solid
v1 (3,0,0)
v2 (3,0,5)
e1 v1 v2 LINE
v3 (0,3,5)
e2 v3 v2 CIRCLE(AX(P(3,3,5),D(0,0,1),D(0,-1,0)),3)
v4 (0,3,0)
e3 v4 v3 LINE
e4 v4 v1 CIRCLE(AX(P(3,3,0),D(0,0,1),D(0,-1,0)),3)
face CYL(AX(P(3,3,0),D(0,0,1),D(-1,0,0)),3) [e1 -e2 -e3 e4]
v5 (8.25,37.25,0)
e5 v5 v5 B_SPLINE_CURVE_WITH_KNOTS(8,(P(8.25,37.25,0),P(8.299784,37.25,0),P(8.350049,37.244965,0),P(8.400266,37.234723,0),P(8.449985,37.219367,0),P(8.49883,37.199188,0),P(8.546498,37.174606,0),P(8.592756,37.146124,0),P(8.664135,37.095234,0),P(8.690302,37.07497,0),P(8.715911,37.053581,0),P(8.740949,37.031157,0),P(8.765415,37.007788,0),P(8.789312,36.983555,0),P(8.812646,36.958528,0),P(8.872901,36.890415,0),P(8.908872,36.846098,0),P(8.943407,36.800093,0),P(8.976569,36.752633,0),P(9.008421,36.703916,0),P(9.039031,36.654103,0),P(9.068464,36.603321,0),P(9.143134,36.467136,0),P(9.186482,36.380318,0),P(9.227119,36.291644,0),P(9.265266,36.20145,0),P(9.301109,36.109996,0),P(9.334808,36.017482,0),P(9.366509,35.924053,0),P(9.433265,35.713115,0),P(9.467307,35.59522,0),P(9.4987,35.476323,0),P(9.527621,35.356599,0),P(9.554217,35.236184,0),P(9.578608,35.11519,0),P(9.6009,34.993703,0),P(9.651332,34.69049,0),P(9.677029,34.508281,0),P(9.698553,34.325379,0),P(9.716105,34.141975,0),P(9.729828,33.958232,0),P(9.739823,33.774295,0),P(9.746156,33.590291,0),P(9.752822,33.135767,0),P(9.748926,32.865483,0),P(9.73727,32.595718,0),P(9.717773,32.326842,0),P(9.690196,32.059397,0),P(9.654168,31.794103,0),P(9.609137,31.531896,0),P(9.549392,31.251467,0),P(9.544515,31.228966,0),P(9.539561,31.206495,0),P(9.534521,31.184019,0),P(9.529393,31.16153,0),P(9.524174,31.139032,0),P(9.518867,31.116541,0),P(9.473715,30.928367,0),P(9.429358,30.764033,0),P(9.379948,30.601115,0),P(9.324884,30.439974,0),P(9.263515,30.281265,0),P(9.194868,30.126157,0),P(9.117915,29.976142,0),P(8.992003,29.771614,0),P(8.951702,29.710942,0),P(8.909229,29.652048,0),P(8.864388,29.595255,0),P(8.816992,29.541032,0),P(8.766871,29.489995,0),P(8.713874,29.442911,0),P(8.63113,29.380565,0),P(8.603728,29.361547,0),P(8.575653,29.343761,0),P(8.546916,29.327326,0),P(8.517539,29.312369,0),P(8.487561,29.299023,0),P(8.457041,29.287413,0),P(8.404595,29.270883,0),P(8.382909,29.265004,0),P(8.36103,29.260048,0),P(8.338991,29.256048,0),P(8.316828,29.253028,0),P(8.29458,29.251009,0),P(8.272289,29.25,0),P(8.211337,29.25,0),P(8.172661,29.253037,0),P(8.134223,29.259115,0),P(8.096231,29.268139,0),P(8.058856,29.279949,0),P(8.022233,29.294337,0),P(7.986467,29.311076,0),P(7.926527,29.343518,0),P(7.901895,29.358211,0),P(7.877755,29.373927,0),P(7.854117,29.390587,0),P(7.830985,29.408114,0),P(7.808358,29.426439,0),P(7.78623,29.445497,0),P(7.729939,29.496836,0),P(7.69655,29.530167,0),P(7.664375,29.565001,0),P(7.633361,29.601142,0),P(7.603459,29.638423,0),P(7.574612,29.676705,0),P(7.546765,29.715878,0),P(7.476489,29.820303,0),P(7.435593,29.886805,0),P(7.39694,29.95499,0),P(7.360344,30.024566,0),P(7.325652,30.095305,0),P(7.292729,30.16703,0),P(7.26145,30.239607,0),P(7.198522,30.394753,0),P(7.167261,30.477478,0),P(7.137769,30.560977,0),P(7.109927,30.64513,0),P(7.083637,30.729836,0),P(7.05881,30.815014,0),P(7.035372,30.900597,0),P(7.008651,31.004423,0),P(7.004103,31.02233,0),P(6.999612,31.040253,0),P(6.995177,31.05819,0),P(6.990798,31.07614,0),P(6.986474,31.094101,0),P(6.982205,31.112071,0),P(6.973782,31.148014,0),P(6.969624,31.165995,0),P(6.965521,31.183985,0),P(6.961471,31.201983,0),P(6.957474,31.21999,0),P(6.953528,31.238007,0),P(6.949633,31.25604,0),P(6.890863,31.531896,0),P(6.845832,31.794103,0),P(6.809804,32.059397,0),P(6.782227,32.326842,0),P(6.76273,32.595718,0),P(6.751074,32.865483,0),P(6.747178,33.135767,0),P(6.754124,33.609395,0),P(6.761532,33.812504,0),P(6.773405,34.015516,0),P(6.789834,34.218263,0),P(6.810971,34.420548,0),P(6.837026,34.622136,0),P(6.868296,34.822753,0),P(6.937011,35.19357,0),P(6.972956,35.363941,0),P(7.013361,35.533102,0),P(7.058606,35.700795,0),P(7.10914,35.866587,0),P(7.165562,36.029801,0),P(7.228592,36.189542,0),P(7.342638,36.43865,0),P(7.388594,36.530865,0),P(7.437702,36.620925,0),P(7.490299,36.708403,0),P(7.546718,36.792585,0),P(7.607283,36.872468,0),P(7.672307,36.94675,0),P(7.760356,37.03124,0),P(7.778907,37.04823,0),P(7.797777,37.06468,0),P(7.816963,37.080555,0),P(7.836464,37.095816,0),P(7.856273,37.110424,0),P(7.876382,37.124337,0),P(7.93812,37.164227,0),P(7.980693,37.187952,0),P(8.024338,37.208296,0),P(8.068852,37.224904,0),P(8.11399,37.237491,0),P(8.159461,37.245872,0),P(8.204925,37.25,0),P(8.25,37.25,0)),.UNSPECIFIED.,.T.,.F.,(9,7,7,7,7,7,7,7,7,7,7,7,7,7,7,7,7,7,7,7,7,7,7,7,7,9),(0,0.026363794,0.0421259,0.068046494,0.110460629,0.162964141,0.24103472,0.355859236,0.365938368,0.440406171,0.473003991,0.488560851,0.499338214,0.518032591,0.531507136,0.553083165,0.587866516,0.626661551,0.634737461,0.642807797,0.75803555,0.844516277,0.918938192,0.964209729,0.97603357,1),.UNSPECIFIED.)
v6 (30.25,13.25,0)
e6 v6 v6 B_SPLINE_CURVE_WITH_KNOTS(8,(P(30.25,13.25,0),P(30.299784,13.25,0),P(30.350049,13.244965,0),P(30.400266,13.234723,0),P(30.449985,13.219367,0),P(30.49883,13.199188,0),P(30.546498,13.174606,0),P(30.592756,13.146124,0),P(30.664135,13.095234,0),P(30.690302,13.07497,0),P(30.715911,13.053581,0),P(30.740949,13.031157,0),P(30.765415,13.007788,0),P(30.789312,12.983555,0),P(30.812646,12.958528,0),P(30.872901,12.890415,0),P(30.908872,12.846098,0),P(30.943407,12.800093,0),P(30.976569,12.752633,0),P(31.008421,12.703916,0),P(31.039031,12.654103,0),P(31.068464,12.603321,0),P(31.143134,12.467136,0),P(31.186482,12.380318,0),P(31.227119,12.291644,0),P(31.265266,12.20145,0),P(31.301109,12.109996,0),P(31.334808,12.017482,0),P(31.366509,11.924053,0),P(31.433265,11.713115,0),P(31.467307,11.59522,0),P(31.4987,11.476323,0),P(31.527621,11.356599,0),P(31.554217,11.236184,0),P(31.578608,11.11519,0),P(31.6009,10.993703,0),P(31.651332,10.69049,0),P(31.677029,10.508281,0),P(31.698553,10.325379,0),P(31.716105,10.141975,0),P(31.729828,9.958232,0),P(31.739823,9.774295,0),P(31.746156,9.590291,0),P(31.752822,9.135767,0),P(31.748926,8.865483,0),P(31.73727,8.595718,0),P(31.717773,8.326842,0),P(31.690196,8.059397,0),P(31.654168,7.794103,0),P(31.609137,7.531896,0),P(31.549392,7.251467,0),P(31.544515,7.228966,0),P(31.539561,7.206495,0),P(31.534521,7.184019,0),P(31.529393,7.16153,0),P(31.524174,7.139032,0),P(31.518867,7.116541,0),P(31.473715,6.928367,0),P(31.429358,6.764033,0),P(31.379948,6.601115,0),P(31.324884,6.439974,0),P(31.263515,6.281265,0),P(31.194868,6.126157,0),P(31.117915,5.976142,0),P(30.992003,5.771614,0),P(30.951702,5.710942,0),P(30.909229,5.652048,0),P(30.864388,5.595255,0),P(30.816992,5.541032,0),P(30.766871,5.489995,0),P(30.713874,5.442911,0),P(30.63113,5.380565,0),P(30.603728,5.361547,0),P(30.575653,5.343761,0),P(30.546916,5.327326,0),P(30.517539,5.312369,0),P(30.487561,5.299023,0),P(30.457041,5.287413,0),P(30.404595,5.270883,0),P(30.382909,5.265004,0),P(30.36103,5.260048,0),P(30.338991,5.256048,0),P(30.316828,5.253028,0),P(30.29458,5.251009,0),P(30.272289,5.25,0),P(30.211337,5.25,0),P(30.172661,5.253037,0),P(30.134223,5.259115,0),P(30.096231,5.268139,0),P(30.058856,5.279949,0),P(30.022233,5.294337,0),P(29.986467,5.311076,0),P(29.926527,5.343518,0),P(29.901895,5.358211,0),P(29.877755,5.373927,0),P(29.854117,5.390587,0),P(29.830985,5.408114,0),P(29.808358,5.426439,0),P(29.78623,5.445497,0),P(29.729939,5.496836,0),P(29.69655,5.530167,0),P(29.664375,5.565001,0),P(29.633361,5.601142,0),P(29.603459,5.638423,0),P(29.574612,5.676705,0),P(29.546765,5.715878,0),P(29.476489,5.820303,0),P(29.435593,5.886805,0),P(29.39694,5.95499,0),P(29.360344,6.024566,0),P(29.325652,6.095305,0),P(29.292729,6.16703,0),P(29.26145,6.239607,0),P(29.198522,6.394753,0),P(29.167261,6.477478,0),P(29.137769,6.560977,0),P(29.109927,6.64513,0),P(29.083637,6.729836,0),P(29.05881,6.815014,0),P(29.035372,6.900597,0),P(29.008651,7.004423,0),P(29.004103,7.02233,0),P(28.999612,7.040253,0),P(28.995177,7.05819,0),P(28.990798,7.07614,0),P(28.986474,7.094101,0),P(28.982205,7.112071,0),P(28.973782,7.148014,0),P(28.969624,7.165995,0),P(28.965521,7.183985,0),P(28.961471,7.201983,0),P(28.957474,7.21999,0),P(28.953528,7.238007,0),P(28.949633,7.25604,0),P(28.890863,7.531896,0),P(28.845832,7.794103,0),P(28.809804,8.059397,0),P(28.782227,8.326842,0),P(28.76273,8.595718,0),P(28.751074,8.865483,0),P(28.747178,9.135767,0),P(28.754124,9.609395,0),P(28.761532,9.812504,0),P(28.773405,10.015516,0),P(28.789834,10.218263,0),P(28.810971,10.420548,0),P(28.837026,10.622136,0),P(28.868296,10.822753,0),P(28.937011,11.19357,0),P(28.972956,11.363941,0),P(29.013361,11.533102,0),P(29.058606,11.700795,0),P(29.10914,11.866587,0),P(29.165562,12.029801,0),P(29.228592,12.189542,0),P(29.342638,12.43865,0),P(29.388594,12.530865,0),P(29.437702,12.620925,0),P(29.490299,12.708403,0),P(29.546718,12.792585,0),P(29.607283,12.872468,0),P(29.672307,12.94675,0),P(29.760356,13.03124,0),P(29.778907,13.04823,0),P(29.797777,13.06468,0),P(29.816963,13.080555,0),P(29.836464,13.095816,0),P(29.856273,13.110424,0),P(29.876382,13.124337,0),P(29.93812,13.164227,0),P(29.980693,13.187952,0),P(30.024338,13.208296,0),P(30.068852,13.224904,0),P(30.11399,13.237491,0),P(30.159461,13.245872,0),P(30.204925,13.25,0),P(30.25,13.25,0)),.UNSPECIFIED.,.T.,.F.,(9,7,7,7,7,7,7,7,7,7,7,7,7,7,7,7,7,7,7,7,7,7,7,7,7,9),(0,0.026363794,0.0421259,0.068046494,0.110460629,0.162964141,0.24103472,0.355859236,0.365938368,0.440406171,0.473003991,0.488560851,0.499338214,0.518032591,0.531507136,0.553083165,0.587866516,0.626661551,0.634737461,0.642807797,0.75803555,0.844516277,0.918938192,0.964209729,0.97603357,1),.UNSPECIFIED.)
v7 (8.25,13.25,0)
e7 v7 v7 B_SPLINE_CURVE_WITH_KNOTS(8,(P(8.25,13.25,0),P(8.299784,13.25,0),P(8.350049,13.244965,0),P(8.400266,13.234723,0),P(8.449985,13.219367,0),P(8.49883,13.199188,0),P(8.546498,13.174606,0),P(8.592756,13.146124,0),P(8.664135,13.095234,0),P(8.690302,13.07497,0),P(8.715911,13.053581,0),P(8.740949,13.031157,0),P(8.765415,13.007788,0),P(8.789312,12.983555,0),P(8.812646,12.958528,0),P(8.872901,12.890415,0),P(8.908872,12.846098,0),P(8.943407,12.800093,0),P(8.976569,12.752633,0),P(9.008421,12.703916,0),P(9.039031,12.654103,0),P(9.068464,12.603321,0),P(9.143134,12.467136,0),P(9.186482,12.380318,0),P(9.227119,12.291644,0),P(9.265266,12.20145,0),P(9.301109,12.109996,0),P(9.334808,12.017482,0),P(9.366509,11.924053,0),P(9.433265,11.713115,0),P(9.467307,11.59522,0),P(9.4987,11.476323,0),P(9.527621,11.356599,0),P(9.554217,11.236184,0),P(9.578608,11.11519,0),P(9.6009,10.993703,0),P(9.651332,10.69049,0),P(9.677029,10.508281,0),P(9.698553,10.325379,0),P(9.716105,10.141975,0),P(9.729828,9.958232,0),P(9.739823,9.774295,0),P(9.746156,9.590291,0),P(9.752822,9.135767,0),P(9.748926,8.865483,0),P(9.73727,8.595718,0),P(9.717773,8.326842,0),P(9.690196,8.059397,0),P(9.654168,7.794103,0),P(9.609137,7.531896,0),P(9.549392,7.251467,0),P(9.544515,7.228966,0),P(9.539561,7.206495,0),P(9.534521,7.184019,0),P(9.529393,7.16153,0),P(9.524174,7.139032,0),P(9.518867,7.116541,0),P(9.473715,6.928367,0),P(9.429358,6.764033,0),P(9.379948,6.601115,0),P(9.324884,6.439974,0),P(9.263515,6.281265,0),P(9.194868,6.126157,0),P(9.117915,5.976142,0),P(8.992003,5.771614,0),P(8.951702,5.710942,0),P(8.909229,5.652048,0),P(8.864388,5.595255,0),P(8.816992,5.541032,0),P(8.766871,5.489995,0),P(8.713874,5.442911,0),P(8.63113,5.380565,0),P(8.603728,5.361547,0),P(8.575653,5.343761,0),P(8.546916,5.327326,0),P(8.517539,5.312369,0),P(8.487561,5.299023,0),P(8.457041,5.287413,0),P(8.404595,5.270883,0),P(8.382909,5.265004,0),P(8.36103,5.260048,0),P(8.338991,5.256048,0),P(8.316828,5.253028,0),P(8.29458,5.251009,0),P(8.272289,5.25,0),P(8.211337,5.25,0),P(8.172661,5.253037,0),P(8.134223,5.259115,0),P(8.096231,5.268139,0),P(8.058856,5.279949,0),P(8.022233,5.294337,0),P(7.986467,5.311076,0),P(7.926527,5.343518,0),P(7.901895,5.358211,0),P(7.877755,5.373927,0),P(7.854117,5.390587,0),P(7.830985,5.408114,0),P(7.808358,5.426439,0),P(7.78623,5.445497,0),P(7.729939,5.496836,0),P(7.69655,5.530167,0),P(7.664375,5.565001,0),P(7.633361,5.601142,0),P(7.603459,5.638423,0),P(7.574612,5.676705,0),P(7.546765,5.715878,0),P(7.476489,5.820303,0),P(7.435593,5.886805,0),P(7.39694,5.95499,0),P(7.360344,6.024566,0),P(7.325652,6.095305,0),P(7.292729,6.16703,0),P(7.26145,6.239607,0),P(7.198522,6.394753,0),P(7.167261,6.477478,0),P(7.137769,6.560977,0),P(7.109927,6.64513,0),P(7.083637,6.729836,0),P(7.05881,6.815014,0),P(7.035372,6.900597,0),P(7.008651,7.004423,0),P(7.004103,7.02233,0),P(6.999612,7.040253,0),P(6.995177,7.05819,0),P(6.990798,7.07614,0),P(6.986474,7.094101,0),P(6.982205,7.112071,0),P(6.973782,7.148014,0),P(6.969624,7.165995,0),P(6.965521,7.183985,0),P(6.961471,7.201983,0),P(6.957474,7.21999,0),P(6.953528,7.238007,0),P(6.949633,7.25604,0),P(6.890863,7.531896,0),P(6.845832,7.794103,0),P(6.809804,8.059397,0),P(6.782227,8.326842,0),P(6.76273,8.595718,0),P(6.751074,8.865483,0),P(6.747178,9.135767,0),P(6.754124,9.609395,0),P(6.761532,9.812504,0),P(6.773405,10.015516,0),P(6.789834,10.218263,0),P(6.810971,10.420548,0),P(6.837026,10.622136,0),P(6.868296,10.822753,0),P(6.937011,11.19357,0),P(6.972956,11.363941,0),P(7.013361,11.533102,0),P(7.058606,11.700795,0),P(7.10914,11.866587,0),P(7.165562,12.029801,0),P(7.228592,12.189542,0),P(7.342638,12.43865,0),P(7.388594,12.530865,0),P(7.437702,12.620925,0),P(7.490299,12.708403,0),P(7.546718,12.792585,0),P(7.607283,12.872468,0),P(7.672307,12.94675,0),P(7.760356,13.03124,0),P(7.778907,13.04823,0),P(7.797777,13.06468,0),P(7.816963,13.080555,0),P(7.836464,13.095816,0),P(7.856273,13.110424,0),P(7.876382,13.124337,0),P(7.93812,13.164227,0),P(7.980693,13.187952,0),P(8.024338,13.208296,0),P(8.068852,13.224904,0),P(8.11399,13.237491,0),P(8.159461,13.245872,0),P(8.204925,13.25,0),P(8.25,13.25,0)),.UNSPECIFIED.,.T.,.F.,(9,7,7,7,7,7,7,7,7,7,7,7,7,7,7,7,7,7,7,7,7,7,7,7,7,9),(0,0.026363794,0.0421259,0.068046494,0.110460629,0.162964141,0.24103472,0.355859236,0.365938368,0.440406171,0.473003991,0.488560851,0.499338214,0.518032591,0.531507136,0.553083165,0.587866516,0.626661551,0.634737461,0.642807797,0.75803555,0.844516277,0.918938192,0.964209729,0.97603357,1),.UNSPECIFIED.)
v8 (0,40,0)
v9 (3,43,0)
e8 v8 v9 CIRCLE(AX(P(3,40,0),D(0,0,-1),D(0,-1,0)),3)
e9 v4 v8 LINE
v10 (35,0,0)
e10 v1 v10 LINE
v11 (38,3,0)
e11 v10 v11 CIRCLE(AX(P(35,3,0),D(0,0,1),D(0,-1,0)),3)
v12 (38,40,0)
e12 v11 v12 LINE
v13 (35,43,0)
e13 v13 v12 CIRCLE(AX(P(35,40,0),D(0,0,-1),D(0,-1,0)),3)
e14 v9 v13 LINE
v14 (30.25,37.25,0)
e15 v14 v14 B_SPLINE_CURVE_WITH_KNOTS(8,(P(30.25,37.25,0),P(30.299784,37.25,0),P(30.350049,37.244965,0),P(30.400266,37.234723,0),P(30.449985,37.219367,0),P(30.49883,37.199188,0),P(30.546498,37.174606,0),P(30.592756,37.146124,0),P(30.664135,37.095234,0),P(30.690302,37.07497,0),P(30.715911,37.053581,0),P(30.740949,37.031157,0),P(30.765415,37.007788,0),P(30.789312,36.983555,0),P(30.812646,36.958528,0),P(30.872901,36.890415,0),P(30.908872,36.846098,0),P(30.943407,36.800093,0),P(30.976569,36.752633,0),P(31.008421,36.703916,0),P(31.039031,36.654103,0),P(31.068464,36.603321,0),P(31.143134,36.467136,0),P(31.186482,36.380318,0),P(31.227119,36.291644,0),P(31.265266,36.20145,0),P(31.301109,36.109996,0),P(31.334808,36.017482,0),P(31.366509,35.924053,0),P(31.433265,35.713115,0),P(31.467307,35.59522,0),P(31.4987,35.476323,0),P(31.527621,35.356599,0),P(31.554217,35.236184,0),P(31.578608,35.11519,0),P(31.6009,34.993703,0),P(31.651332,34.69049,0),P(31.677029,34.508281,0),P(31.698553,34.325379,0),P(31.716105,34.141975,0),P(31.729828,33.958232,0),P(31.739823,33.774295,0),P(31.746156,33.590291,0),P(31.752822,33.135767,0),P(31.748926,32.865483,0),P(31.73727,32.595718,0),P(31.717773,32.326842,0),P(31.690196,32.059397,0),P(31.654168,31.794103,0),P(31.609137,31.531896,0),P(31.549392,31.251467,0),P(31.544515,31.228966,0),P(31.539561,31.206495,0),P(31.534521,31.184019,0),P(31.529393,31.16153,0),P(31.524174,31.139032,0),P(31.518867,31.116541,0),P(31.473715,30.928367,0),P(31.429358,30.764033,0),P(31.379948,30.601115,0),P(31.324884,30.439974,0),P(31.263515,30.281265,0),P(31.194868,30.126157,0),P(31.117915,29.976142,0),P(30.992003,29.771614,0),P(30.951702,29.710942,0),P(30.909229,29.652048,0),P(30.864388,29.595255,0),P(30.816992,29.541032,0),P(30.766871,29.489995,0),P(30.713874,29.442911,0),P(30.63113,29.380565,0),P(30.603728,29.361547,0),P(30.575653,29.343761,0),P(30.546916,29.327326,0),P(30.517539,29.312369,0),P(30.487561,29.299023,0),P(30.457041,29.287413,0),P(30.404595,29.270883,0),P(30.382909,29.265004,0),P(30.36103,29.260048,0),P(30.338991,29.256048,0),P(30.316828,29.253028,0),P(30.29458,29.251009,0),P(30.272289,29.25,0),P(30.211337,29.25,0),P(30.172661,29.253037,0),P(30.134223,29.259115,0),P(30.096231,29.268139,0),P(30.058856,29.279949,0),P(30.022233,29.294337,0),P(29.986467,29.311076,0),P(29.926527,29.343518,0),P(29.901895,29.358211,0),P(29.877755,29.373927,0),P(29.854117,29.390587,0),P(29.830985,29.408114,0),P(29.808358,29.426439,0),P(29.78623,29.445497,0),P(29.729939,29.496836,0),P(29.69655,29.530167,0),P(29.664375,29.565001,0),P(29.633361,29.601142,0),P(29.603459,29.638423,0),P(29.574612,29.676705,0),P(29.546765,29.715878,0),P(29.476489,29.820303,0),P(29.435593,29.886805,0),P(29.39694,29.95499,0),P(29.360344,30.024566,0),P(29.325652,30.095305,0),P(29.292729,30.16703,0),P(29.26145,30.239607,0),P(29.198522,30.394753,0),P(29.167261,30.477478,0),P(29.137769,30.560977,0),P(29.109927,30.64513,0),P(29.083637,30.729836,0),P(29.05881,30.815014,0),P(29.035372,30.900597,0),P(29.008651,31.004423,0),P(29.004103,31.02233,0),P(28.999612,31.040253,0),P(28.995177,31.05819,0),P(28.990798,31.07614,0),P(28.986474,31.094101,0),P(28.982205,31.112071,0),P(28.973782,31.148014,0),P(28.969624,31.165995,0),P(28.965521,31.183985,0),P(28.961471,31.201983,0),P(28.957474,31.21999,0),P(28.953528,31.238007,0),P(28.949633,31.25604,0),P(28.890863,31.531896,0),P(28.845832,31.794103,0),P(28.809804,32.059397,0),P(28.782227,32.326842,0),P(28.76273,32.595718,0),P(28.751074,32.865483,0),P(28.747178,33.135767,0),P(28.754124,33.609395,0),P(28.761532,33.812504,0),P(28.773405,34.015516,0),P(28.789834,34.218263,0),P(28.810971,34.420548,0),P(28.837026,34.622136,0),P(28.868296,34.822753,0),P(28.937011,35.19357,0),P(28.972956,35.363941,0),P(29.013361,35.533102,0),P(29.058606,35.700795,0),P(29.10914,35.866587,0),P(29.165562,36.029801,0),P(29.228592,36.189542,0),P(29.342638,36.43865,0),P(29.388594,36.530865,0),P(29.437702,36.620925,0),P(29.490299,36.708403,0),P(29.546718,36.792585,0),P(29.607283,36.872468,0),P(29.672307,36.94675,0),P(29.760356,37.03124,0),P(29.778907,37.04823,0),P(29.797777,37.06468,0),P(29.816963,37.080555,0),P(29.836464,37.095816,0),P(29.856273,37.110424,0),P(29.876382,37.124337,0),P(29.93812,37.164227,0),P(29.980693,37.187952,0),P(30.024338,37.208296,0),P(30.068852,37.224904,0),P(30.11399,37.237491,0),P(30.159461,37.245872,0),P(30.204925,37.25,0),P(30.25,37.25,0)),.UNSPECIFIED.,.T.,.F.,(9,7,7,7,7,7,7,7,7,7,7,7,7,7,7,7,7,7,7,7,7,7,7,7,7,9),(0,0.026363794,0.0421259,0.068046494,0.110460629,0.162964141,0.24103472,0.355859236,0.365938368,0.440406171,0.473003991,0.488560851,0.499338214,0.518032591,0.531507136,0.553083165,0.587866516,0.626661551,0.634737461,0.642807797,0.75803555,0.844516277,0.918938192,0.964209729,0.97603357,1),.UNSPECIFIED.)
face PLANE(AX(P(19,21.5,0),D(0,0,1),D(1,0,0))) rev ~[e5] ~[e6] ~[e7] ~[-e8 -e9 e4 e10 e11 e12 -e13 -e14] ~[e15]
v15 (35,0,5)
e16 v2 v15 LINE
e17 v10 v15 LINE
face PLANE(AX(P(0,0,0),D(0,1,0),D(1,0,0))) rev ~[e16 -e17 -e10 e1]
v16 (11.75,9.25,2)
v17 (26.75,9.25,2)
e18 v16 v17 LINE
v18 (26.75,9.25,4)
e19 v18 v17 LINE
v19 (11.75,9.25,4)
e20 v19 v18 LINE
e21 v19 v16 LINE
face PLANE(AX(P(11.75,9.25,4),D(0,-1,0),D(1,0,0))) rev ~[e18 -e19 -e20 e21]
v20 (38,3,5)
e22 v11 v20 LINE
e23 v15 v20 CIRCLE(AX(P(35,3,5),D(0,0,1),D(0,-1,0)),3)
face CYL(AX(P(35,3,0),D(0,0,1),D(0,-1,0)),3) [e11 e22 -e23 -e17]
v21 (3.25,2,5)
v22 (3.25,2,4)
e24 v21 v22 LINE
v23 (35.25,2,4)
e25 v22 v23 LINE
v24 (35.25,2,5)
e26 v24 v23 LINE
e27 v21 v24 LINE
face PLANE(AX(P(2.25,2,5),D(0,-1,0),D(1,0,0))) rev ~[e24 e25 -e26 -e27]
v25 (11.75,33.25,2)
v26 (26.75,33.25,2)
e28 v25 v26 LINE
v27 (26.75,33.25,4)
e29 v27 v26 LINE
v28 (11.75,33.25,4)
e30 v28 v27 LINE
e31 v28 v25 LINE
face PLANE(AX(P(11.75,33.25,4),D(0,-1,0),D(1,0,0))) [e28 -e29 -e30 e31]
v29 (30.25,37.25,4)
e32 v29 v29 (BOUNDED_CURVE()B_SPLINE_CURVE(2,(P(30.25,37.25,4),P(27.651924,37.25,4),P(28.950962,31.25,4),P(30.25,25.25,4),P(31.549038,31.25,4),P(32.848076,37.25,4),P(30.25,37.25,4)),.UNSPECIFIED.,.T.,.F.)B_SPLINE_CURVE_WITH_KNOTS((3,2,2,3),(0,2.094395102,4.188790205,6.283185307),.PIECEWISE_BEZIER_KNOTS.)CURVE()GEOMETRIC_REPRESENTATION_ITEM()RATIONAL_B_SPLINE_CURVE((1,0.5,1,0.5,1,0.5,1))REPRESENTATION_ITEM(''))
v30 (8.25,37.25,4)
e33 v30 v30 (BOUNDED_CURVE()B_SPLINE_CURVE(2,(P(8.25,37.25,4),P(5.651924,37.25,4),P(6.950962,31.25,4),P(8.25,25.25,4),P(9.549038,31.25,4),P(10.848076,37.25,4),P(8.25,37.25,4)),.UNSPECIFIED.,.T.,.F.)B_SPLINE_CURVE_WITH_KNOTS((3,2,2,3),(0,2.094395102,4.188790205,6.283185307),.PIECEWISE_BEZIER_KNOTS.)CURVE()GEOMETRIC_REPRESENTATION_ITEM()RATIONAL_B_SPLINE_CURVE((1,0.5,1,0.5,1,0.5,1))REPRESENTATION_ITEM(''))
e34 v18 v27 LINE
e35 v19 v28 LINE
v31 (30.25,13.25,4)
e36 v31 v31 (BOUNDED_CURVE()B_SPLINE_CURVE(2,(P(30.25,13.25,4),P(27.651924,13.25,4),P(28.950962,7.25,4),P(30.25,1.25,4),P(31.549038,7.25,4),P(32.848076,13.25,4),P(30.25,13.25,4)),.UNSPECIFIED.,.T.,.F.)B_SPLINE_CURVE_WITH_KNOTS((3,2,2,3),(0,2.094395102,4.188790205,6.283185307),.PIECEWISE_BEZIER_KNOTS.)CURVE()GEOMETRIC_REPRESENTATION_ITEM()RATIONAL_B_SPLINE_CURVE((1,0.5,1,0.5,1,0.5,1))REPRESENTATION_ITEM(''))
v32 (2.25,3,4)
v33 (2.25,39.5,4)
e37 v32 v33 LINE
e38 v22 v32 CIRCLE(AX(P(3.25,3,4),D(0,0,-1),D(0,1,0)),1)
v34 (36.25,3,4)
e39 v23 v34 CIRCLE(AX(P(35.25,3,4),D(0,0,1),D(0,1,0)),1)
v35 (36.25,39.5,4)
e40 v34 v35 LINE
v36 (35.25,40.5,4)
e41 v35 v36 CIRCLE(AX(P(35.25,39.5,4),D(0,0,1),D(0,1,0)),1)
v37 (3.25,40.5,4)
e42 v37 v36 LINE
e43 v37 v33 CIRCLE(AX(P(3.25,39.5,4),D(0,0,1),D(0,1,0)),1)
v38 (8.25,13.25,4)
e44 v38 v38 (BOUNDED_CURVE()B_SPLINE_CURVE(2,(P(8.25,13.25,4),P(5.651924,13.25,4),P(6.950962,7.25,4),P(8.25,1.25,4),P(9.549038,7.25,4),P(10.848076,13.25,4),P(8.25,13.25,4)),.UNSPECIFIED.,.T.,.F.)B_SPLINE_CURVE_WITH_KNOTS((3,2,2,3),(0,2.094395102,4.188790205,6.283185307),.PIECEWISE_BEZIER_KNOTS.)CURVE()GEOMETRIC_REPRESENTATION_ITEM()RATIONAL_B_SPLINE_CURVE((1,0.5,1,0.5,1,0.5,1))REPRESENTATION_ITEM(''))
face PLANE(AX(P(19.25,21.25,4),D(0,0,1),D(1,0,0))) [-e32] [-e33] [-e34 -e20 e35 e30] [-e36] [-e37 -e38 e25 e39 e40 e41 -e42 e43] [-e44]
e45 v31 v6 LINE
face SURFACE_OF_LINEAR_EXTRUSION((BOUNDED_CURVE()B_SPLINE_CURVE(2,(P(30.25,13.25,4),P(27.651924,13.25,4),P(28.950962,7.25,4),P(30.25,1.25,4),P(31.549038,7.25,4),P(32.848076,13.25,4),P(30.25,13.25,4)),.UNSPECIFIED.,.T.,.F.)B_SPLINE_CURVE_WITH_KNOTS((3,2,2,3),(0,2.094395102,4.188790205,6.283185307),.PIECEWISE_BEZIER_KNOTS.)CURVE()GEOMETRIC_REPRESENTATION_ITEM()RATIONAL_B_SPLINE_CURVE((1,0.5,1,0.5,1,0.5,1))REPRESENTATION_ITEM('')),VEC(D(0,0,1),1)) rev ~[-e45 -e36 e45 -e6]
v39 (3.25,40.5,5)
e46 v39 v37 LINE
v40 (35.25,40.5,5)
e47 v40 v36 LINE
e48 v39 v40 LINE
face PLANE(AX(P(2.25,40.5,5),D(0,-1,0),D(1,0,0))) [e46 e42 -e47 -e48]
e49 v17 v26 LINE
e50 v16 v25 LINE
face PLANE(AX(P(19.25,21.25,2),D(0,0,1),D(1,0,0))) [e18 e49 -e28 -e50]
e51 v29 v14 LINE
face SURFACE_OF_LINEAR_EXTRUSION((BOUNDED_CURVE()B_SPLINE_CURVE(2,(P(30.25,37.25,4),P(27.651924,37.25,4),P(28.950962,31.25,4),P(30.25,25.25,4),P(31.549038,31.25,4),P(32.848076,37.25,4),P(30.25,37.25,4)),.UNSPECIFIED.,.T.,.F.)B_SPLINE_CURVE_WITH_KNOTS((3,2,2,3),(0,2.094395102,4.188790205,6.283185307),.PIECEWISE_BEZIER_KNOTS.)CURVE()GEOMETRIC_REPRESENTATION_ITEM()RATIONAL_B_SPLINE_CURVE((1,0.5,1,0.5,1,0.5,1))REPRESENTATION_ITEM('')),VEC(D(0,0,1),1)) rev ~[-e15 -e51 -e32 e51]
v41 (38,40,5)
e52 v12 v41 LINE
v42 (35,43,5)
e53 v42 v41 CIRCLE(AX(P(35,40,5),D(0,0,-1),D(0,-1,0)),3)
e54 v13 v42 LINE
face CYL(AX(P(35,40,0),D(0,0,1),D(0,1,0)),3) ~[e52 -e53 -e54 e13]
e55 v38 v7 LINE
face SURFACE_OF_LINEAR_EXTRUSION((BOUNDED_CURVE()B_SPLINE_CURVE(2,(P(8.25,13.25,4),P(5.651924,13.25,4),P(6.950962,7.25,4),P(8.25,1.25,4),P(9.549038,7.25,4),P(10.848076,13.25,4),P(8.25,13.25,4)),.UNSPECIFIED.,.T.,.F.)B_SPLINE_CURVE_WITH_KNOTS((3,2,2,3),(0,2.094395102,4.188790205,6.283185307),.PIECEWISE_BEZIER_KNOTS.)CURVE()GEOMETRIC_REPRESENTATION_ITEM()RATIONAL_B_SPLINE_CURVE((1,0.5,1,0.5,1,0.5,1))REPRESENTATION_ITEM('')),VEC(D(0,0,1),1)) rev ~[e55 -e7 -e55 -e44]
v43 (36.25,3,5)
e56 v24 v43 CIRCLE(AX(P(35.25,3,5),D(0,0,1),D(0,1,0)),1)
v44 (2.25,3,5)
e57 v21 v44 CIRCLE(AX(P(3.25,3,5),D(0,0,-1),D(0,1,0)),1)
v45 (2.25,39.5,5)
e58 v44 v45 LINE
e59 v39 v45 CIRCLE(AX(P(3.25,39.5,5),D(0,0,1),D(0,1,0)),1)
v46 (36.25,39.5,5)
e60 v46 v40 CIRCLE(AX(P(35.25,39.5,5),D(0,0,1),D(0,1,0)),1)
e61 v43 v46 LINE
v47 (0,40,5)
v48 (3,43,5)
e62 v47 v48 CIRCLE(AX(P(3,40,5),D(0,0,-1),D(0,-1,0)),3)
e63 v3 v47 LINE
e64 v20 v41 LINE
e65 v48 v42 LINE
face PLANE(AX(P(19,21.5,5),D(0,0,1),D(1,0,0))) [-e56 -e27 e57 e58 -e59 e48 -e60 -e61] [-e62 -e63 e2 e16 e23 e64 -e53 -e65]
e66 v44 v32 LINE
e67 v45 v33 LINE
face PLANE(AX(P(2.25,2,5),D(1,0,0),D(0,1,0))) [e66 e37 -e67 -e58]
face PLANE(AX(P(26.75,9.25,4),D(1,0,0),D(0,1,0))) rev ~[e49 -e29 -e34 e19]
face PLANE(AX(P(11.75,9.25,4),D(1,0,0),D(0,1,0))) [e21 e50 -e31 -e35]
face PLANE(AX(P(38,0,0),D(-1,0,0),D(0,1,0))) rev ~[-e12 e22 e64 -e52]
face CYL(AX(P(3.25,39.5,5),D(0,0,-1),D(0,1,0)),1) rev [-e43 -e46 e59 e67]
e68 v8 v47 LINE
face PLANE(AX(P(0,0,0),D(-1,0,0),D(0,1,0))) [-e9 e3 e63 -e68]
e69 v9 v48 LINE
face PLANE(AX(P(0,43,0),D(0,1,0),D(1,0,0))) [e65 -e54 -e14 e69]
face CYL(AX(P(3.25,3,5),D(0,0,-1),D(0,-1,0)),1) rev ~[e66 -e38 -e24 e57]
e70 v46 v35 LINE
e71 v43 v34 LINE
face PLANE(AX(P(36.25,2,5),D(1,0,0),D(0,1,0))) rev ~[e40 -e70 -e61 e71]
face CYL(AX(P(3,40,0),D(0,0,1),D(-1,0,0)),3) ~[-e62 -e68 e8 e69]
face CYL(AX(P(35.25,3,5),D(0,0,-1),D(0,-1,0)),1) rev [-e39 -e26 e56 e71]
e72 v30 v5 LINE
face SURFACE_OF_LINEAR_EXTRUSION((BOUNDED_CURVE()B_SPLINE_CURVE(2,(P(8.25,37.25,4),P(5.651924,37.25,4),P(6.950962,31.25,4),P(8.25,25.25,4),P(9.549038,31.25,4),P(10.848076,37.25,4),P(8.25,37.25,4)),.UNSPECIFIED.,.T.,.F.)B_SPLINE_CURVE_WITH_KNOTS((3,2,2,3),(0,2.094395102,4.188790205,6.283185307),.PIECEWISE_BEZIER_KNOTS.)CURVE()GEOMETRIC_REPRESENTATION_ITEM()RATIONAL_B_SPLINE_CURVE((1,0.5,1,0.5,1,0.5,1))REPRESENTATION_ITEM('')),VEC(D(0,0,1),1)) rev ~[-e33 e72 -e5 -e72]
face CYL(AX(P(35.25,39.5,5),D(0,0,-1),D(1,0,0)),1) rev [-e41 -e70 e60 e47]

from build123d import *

# Parameters (mm, degrees)
F0_W     = 38
F0_H     = 43
F1_DEPTH = 5
F2_W     = 34
F2_H     = 38.5
F3_DEPTH = 1
F5_DEPTH = 25
F6_R     = 3
F7_R     = 1
F4_W     = 15
F4_H     = 24
F8_DEPTH = 2


# Not quite as in the source:
# - a feature names something its author has since deleted; it is built from what else it names


with BuildPart() as f1:
    # F0 (on Top) → F1 (new body)
    with BuildSketch(Plane.XY):
        with Locations((19, 21.5)):
            Rectangle(F0_W, F0_H)
    extrude(amount=F1_DEPTH)

    # F2 (on face) → F3 (cut)
    with BuildSketch(Plane.XY.offset(5)):
        with Locations((19.25, 21.25)):
            Rectangle(F2_W, F2_H)
    extrude(amount=-F3_DEPTH, mode=Mode.SUBTRACT)

    # F4 (on face) → F5 (cut)
    with BuildSketch(Plane.XY.offset(4)):
        with BuildLine():
            add(Edge.make_bspline(
                [(8.25, 37.25), (5.6519237886, 37.25), (6.9509618943, 31.25), (8.25, 25.25), (9.5490381057, 31.25), (10.8480762114, 37.25), (8.25, 37.25)],
                knots=[0, 0, 0, 2.0943951024, 2.0943951024, 4.1887902048, 4.1887902048, 6.2831853072, 6.2831853072, 6.2831853072], degree=2, weights=[1, 0.5, 1, 0.5, 1, 0.5, 1]))
        make_face()
        with BuildLine():
            add(Edge.make_bspline(
                [(30.25, 37.25), (27.6519237886, 37.25), (28.9509618943, 31.25), (30.25, 25.25), (31.5490381057, 31.25), (32.8480762114, 37.25), (30.25, 37.25)],
                knots=[0, 0, 0, 2.0943951024, 2.0943951024, 4.1887902048, 4.1887902048, 6.2831853072, 6.2831853072, 6.2831853072], degree=2, weights=[1, 0.5, 1, 0.5, 1, 0.5, 1]))
        make_face()
        with BuildLine():
            add(Edge.make_bspline(
                [(30.25, 13.25), (27.6519237886, 13.25), (28.9509618943, 7.25), (30.25, 1.25), (31.5490381057, 7.25), (32.8480762114, 13.25), (30.25, 13.25)],
                knots=[0, 0, 0, 2.0943951024, 2.0943951024, 4.1887902048, 4.1887902048, 6.2831853072, 6.2831853072, 6.2831853072], degree=2, weights=[1, 0.5, 1, 0.5, 1, 0.5, 1]))
        make_face()
        with BuildLine():
            add(Edge.make_bspline(
                [(8.25, 13.25), (5.6519237886, 13.25), (6.9509618943, 7.25), (8.25, 1.25), (9.5490381057, 7.25), (10.8480762114, 13.25), (8.25, 13.25)],
                knots=[0, 0, 0, 2.0943951024, 2.0943951024, 4.1887902048, 4.1887902048, 6.2831853072, 6.2831853072, 6.2831853072], degree=2, weights=[1, 0.5, 1, 0.5, 1, 0.5, 1]))
        make_face()
    extrude(amount=-F5_DEPTH, mode=Mode.SUBTRACT)

    # F6
    f6_edges = [f1.edges().sort_by_distance(p)[0] for p in [
        (0, 0, 2.5),
        (38, 0, 2.5),
        (0, 43, 2.5),
        (38, 43, 2.5),
    ]]
    fillet(f6_edges, radius=F6_R)

    # F7
    f7_edges = [f1.edges().sort_by_distance(p)[0] for p in [
        (2.25, 2, 4.5),
        (2.25, 40.5, 4.5),
        (36.25, 2, 4.5),
        (36.25, 40.5, 4.5),
    ]]
    fillet(f7_edges, radius=F7_R)

    # F4 (on face) → F8 (cut)
    with BuildSketch(Plane.XY.offset(4)):
        with Locations((19.25, 21.25)):
            Rectangle(F4_W, F4_H)
    extrude(amount=-F8_DEPTH, mode=Mode.SUBTRACT)


solid = f1.part
